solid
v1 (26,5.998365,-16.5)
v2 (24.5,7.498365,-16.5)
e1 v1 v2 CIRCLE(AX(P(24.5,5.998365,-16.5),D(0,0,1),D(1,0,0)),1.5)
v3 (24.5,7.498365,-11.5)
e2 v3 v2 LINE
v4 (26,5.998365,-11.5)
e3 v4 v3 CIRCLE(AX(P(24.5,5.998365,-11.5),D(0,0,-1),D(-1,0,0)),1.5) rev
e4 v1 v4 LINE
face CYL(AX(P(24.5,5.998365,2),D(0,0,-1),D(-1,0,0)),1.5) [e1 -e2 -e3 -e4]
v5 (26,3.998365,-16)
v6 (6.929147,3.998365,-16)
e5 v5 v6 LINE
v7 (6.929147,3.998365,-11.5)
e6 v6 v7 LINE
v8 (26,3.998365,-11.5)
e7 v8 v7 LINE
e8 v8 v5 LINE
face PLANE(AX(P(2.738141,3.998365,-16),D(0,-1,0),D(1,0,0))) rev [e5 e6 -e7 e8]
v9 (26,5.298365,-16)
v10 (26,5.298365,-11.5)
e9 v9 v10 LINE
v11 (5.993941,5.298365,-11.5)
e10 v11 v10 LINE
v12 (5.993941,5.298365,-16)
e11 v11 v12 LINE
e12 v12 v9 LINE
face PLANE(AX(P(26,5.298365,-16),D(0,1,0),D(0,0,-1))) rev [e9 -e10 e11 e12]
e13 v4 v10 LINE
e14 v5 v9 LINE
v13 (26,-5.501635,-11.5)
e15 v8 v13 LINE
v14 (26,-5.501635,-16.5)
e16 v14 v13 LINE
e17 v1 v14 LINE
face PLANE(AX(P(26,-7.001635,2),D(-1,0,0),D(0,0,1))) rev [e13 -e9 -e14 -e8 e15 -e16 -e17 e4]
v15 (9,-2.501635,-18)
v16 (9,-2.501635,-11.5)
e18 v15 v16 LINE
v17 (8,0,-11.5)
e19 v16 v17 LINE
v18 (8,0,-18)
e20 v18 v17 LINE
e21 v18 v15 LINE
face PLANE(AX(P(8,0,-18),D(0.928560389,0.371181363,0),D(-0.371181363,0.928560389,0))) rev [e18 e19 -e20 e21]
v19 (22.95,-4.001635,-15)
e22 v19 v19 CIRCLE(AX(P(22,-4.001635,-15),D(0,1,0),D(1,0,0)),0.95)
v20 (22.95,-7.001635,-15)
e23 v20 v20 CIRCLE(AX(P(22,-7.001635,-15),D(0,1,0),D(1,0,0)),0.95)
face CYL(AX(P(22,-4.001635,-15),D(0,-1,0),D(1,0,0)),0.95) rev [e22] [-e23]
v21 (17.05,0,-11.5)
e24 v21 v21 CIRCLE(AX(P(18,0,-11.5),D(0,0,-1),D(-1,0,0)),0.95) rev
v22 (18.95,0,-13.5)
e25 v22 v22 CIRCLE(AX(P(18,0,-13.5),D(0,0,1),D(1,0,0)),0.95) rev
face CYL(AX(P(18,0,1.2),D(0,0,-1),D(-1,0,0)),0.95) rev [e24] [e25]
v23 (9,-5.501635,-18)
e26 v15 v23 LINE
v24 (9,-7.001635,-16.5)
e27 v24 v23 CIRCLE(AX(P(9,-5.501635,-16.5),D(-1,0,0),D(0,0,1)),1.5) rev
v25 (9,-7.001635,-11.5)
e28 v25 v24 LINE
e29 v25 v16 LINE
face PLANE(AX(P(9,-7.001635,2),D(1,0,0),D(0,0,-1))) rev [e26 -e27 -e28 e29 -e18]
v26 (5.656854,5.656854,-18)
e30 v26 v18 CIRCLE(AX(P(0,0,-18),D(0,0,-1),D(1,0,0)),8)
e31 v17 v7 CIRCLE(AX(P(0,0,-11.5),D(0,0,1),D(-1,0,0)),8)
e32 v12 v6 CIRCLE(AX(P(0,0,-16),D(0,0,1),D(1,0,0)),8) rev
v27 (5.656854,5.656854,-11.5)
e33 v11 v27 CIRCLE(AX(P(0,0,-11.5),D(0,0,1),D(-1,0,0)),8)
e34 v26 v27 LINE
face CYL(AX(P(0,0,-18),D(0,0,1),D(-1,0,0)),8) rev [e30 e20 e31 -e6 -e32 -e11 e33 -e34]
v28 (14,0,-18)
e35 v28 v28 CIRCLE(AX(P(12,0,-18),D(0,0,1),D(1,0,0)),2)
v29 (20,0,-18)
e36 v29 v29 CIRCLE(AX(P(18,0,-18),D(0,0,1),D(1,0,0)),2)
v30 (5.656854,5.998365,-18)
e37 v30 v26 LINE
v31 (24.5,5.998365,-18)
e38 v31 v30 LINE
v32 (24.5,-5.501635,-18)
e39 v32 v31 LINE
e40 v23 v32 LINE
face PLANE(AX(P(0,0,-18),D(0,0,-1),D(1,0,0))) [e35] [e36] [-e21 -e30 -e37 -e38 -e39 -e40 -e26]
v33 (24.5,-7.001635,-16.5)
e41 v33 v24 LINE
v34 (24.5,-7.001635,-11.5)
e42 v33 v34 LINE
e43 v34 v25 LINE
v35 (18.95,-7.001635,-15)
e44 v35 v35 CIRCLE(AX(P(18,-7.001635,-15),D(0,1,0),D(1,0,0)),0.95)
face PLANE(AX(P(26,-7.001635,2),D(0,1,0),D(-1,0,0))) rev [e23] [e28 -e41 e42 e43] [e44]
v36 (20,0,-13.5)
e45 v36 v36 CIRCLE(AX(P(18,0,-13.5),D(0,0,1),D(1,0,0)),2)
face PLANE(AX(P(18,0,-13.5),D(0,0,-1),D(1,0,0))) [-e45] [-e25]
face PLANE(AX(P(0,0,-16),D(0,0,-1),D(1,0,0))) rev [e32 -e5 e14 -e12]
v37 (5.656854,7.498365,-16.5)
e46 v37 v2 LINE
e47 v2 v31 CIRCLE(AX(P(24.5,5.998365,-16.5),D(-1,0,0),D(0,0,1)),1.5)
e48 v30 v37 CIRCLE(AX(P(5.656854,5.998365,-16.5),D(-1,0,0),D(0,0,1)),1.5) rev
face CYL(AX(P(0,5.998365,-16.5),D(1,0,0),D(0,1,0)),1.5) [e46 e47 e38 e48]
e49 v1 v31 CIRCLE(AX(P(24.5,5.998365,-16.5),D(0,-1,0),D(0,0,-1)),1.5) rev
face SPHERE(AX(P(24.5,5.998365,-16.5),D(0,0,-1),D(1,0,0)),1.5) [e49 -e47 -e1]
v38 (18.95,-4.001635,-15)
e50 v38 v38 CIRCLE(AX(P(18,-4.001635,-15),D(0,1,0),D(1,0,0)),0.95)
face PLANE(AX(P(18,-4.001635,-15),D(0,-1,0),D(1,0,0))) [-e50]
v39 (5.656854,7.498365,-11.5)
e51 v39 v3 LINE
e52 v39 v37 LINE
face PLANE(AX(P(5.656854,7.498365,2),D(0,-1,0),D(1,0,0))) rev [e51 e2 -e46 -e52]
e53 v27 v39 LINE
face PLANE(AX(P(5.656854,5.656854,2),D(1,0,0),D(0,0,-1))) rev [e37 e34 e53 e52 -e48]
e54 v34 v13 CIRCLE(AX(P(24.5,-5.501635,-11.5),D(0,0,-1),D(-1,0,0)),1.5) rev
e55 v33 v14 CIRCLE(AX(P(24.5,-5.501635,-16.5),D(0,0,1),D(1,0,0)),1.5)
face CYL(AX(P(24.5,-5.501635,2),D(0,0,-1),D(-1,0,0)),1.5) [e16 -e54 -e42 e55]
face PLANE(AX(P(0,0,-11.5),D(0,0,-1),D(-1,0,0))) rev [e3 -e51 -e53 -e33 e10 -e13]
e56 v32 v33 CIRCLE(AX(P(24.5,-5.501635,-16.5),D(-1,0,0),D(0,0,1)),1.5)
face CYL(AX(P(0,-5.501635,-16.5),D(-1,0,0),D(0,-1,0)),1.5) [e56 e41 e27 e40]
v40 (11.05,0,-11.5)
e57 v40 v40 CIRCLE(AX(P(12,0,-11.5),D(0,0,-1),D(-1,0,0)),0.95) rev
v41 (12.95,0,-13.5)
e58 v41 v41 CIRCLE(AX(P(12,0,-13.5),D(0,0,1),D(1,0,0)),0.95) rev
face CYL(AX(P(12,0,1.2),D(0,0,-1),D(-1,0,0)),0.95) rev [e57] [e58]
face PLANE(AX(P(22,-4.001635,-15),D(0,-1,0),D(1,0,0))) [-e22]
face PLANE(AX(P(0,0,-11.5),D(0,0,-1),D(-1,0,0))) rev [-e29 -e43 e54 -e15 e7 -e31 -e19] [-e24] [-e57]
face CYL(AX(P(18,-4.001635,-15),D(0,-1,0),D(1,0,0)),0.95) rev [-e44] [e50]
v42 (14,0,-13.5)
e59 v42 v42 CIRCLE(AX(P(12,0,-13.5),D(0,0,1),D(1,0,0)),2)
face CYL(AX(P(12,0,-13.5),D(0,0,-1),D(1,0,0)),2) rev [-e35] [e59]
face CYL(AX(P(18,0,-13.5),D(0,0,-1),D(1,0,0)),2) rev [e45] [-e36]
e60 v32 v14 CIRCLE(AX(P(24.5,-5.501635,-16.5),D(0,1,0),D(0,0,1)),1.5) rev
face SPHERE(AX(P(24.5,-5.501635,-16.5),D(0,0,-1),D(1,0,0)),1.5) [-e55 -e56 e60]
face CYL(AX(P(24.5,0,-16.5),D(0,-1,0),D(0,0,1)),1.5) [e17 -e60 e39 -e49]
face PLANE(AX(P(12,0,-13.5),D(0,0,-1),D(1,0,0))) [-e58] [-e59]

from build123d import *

# Parameters (mm, degrees)
BOSS_EXTRUDE1_DEPTH = 2
BOSS_EXTRUDE2_START = 4.5
BOSS_EXTRUDE2_DEPTH = 4.5
CUT_EXTRUDE1_DEPTH  = 4.5
BOSS_EXTRUDE3_DEPTH = 2.3
SKETCH9_R           = 2.1
CUT_EXTRUDE2_DEPTH  = 2.5
SKETCH10_R          = 2.5
BOSS_EXTRUDE4_DEPTH = 1.2
SKETCH11_R          = 0.95
CUT_EXTRUDE3_DEPTH  = 9.2
SKETCH12_R          = 2
CUT_EXTRUDE4_DEPTH  = 4.5
SKETCH14_W          = 20.343145751
SKETCH14_H          = 1.841510486
SKETCH14_W_2        = 17
SKETCH14_H_2        = 1.341637015
BOSS_EXTRUDE5_DEPTH = 1.2
FILLET1_R           = 1.5
SKETCH17_R          = 0.95
CUT_EXTRUDE5_DEPTH  = 3


# Read off the part's stored shape, not the designer's step: Boss-Extrude3
with BuildPart() as part:
    # Sketch5 → Boss-Extrude1 (new body)
    with BuildSketch(Plane.XY):
        with BuildLine():
            Line((8, 0), (9, -2.501635265))
            Line((9, -2.501635265), (9, -7.001635265))
            Line((9, -7.001635265), (26, -7.001635265))
            Line((26, -7.001635265), (26, 7.498364735))
            Line((26, 7.498364735), (5.656854249, 7.498364735))
            Line((5.656854249, 7.498364735), (5.656854249, 5.656854249))
            ThreePointArc((5.656854249, 5.656854249), (7.39103626, 3.061467459), (8, 0))
        make_face()
    extrude(amount=BOSS_EXTRUDE1_DEPTH)

    # Sketch6 → Boss-Extrude2 (add)
    with BuildSketch(Plane(origin=(0, 0, 0), x_dir=(-1, 0, 0), z_dir=(0, 0, -1)).offset(BOSS_EXTRUDE2_START)):
        with BuildLine():
            Line((-5.656854249, 7.498364735), (-5.656854249, 5.656854249))
            ThreePointArc((-5.656854249, 5.656854249), (-7.39103626, 3.061467459), (-8, 0))
            Line((-8, 0), (-9, -2.501635265))
            Line((-9, -2.501635265), (-9, -7.001635265))
            Line((-9, -7.001635265), (-26, -7.001635265))
            Line((-26, -7.001635265), (-26, 7.498364735))
            Line((-26, 7.498364735), (-5.656854249, 7.498364735))
        make_face()
    extrude(amount=-BOSS_EXTRUDE2_DEPTH)

    # Sketch7 → Cut-Extrude1 (cut)
    with BuildSketch(Plane(origin=(0, 0, -4.5), x_dir=(-1, 0, 0), z_dir=(0, 0, -1))):
        Polygon((-26, 5.298364735), (-2.738141148, 5.298364735), (-2.738141148, 3.998364735), (-29.849535112, 3.998364735), (-29.849535112, 5.298364735), align=None)
    extrude(amount=-CUT_EXTRUDE1_DEPTH, mode=Mode.SUBTRACT)

    # Boss-Extrude3 outline → Boss-Extrude3 (add)
    with BuildSketch(Plane(origin=(0, 0, -4.5), x_dir=(-1, 0, 0), z_dir=(0, 0, -1))):
        with BuildLine():
            Line((-9, -7.001635265), (-9, -5.65999825))
            Line((-9, -5.65999825), (0, -5.659997813))
            ThreePointArc((0, -5.659997813), (5.659997813, 0), (0, 5.659997813))
            Line((0, 5.659997813), (-5.656854249, 5.656854249))
            Line((-5.656854249, 5.656854249), (-5.656854249, 7.498364735))
            Line((-5.656854249, 7.498364735), (-26, 7.498364735))
            Line((-26, 7.498364735), (-26, -7.001635265))
            Line((-26, -7.001635265), (-9, -7.001635265))
        make_face()
    extrude(amount=BOSS_EXTRUDE3_DEPTH)

    # Sketch9 → Cut-Extrude2 (cut)
    with BuildSketch(Plane(origin=(0, 0, -6.8), x_dir=(-1, 0, 0), z_dir=(0, 0, -1))):
        Circle(SKETCH9_R)
    extrude(amount=-CUT_EXTRUDE2_DEPTH, mode=Mode.SUBTRACT)

    # Sketch10 → Boss-Extrude4 (add)
    with BuildSketch(Plane(origin=(0, 0, -6.8), x_dir=(-1, 0, 0), z_dir=(0, 0, -1))):
        with Locations((-12, 0)):
            Circle(SKETCH10_R)
        with Locations((-18, 0)):
            Circle(SKETCH10_R)
    extrude(amount=BOSS_EXTRUDE4_DEPTH)

    # Sketch11 → Cut-Extrude3 (cut)
    with BuildSketch(Plane(origin=(0, 0, -8), x_dir=(-1, 0, 0), z_dir=(0, 0, -1))):
        with Locations((-18, 0)):
            Circle(SKETCH11_R)
        with Locations((-12, 0)):
            Circle(SKETCH11_R)
    extrude(amount=-CUT_EXTRUDE3_DEPTH, mode=Mode.SUBTRACT)

    # Sketch12 → Cut-Extrude4 (cut)
    with BuildSketch(Plane.XY.offset(2)):
        with Locations((12, 0)):
            Circle(SKETCH12_R)
        with Locations((18, 0)):
            Circle(SKETCH12_R)
    extrude(amount=-CUT_EXTRUDE4_DEPTH, mode=Mode.SUBTRACT)

    # Sketch14 → Boss-Extrude5 (add)
    with BuildSketch(Plane(origin=(0, 0, -6.8), x_dir=(-1, 0, 0), z_dir=(0, 0, -1))):
        with Locations((-15.828427124, 6.577609492)):
            Rectangle(SKETCH14_W, SKETCH14_H)
        with Locations((-17.5, -6.330816758)):
            Rectangle(SKETCH14_W_2, SKETCH14_H_2)
    extrude(amount=BOSS_EXTRUDE5_DEPTH)

    # Fillet1
    # the kernel refuses this fillet: 1.5 mm, written as the material it takes off along each edge
    with BuildSketch(Plane(origin=(24.5, -5.501635265, 0.5), x_dir=(0, 0, 1), z_dir=(0, -1, 0))) as fillet1_piece_1_section:
        Polygon((0, 0), (FILLET1_R, 0), (FILLET1_R, -FILLET1_R), (0, -FILLET1_R), align=None)
    fillet1_piece_1 = extrude(amount=FILLET1_R, mode=Mode.PRIVATE)
    fillet1_piece_1 = fillet1_piece_1 - Plane(origin=(24.5, -5.501635265, 0.5), x_dir=(-0.7071067811865475, 0, -0.7071067811865475), z_dir=(0, -1, 0)) * Sphere(FILLET1_R, mode=Mode.PRIVATE)
    add(fillet1_piece_1, mode=Mode.SUBTRACT)
    with BuildSketch(Plane(origin=(24.5, 5.998364735, 0.5), x_dir=(0, 0, 1), z_dir=(0, 1, 0))) as fillet1_piece_2_section:
        Polygon((0, 0), (FILLET1_R, 0), (FILLET1_R, FILLET1_R), (0, FILLET1_R), align=None)
    fillet1_piece_2 = extrude(amount=FILLET1_R, mode=Mode.PRIVATE)
    fillet1_piece_2 = fillet1_piece_2 - Plane(origin=(24.5, 5.998364735, 0.5), x_dir=(-0.7071067811865475, 0, -0.7071067811865475), z_dir=(0, 1, 0)) * Sphere(FILLET1_R, mode=Mode.PRIVATE)
    add(fillet1_piece_2, mode=Mode.SUBTRACT)
    with BuildSketch(Plane(origin=(26, -5.501635265, 2), x_dir=(-1, 0, 0), z_dir=(0, 1, 0))) as fillet1_piece_3:
        with BuildLine():
            CenterArc((FILLET1_R, -FILLET1_R), FILLET1_R, 90, 90)
            Line((0, -FILLET1_R), (0, 0))
            Line((0, 0), (FILLET1_R, 0))
        make_face()
    extrude(amount=11.5, mode=Mode.SUBTRACT)
    with BuildSketch(Plane(origin=(26, -7.001635265, -4.5), x_dir=(-1, 0, 0), z_dir=(0, 0, 1))) as fillet1_piece_4:
        with BuildLine():
            CenterArc((FILLET1_R, -FILLET1_R), FILLET1_R, 90, 90)
            Line((0, -FILLET1_R), (0, 0))
            Line((0, 0), (FILLET1_R, 0))
        make_face()
    extrude(amount=5, mode=Mode.SUBTRACT)
    with BuildSketch(Plane(origin=(5.25, -7.001635265, 2), x_dir=(0, 1, 0), z_dir=(1, 0, 0))) as fillet1_piece_5:
        with BuildLine():
            CenterArc((FILLET1_R, -FILLET1_R), FILLET1_R, 90, 90)
            Line((0, -FILLET1_R), (0, 0))
            Line((0, 0), (FILLET1_R, 0))
        make_face()
    extrude(amount=19.25, mode=Mode.SUBTRACT)
    with BuildSketch(Plane(origin=(24.5, 7.498364735, 2), x_dir=(0, -1, 0), z_dir=(-1, 0, 0))) as fillet1_piece_6:
        with BuildLine():
            CenterArc((FILLET1_R, -FILLET1_R), FILLET1_R, 90, 90)
            Line((0, -FILLET1_R), (0, 0))
            Line((0, 0), (FILLET1_R, 0))
        make_face()
    extrude(amount=22.593145751, mode=Mode.SUBTRACT)
    with BuildSketch(Plane(origin=(26, 7.498364735, -4.5), x_dir=(-1, 0, 0), z_dir=(0, 0, 1))) as fillet1_piece_7:
        with BuildLine():
            CenterArc((FILLET1_R, FILLET1_R), FILLET1_R, 180, 90)
            Line((0, FILLET1_R), (0, 0))
            Line((0, 0), (FILLET1_R, 0))
        make_face()
    extrude(amount=5, mode=Mode.SUBTRACT)
    with BuildSketch(Plane(origin=(26, 7.498364735, -4.5), x_dir=(-1.0, -1.9174232572065026e-10, 0), z_dir=(0, 0, -1))) as fillet1_piece_8:
        with BuildLine():
            CenterArc((FILLET1_R, -FILLET1_R), FILLET1_R, 90.000000011, 90)
            Line((FILLET1_R * 1.9173522033e-10, -FILLET1_R), (0, 0))
            Line((0, 0), (FILLET1_R, 0))
        make_face()
    extrude(amount=2.3, mode=Mode.SUBTRACT)
    with BuildSketch(Plane(origin=(26, 7.498364735, -6.8), x_dir=(-1, 0, 0), z_dir=(0, 0, -1))) as fillet1_piece_9:
        with BuildLine():
            CenterArc((FILLET1_R, -FILLET1_R), FILLET1_R, 90, 90)
            Line((0, -FILLET1_R), (0, 0))
            Line((0, 0), (FILLET1_R, 0))
        make_face()
    extrude(amount=4.95, mode=Mode.SUBTRACT)
    with BuildSketch(Plane(origin=(26, -7.001635265, -4.5), x_dir=(-1.0, -1.9169850891861218e-10, 0), z_dir=(0, 0, -1))) as fillet1_piece_10:
        with BuildLine():
            CenterArc((FILLET1_R, FILLET1_R), FILLET1_R, 180.000000011, 90)
            Line((-FILLET1_R * 1.91707982785e-10, FILLET1_R), (0, 0))
            Line((0, 0), (FILLET1_R, 0))
        make_face()
    extrude(amount=2.3, mode=Mode.SUBTRACT)
    with BuildSketch(Plane(origin=(26, -7.001635265, -6.8), x_dir=(-1, 0, 0), z_dir=(0, 0, -1))) as fillet1_piece_11:
        with BuildLine():
            CenterArc((FILLET1_R, FILLET1_R), FILLET1_R, 180, 90)
            Line((0, FILLET1_R), (0, 0))
            Line((0, 0), (FILLET1_R, 0))
        make_face()
    extrude(amount=4.95, mode=Mode.SUBTRACT)

    # Sketch17 → Cut-Extrude5 (cut)
    with BuildSketch(Plane.XZ.offset(7.001635265)):
        with Locations((22, -1)):
            Circle(SKETCH17_R)
        with Locations((18, -1)):
            Circle(SKETCH17_R)
    extrude(amount=-CUT_EXTRUDE5_DEPTH, mode=Mode.SUBTRACT)

    # Mirror1: part across plane


with BuildPart() as part_1:
    add(part.part)
    add(part.part.mirror(Plane(origin=(0, 0, -8), x_dir=(1, 0, 0), z_dir=(0, 0, -1))))


with BuildPart() as body_2:
    # Split1: the piece on the far side of the plane
    add(part_1.part)
    split(bisect_by=Plane(origin=(0, 0, -8), x_dir=(-1, 0, 0), z_dir=(0, 0, -1)), keep=Keep.BOTTOM)


with BuildPart() as part_2:
    add(part_1.part)

    # Split1
    split(bisect_by=Plane(origin=(0, 0, -8), x_dir=(-1, 0, 0), z_dir=(0, 0, -1)), keep=Keep.TOP)


with BuildPart() as body_2_2:
    # Split2: the piece on the far side of the plane
    add(part_2.part)
    split(bisect_by=Plane(origin=(0, 0, -11.5), x_dir=(-1, 0, 0), z_dir=(0, 0, -1)), keep=Keep.BOTTOM)


with BuildPart() as part_3:
    add(part_2.part)

    # Split2
    split(bisect_by=Plane(origin=(0, 0, -11.5), x_dir=(-1, 0, 0), z_dir=(0, 0, -1)), keep=Keep.TOP)


solid = part_3.part
